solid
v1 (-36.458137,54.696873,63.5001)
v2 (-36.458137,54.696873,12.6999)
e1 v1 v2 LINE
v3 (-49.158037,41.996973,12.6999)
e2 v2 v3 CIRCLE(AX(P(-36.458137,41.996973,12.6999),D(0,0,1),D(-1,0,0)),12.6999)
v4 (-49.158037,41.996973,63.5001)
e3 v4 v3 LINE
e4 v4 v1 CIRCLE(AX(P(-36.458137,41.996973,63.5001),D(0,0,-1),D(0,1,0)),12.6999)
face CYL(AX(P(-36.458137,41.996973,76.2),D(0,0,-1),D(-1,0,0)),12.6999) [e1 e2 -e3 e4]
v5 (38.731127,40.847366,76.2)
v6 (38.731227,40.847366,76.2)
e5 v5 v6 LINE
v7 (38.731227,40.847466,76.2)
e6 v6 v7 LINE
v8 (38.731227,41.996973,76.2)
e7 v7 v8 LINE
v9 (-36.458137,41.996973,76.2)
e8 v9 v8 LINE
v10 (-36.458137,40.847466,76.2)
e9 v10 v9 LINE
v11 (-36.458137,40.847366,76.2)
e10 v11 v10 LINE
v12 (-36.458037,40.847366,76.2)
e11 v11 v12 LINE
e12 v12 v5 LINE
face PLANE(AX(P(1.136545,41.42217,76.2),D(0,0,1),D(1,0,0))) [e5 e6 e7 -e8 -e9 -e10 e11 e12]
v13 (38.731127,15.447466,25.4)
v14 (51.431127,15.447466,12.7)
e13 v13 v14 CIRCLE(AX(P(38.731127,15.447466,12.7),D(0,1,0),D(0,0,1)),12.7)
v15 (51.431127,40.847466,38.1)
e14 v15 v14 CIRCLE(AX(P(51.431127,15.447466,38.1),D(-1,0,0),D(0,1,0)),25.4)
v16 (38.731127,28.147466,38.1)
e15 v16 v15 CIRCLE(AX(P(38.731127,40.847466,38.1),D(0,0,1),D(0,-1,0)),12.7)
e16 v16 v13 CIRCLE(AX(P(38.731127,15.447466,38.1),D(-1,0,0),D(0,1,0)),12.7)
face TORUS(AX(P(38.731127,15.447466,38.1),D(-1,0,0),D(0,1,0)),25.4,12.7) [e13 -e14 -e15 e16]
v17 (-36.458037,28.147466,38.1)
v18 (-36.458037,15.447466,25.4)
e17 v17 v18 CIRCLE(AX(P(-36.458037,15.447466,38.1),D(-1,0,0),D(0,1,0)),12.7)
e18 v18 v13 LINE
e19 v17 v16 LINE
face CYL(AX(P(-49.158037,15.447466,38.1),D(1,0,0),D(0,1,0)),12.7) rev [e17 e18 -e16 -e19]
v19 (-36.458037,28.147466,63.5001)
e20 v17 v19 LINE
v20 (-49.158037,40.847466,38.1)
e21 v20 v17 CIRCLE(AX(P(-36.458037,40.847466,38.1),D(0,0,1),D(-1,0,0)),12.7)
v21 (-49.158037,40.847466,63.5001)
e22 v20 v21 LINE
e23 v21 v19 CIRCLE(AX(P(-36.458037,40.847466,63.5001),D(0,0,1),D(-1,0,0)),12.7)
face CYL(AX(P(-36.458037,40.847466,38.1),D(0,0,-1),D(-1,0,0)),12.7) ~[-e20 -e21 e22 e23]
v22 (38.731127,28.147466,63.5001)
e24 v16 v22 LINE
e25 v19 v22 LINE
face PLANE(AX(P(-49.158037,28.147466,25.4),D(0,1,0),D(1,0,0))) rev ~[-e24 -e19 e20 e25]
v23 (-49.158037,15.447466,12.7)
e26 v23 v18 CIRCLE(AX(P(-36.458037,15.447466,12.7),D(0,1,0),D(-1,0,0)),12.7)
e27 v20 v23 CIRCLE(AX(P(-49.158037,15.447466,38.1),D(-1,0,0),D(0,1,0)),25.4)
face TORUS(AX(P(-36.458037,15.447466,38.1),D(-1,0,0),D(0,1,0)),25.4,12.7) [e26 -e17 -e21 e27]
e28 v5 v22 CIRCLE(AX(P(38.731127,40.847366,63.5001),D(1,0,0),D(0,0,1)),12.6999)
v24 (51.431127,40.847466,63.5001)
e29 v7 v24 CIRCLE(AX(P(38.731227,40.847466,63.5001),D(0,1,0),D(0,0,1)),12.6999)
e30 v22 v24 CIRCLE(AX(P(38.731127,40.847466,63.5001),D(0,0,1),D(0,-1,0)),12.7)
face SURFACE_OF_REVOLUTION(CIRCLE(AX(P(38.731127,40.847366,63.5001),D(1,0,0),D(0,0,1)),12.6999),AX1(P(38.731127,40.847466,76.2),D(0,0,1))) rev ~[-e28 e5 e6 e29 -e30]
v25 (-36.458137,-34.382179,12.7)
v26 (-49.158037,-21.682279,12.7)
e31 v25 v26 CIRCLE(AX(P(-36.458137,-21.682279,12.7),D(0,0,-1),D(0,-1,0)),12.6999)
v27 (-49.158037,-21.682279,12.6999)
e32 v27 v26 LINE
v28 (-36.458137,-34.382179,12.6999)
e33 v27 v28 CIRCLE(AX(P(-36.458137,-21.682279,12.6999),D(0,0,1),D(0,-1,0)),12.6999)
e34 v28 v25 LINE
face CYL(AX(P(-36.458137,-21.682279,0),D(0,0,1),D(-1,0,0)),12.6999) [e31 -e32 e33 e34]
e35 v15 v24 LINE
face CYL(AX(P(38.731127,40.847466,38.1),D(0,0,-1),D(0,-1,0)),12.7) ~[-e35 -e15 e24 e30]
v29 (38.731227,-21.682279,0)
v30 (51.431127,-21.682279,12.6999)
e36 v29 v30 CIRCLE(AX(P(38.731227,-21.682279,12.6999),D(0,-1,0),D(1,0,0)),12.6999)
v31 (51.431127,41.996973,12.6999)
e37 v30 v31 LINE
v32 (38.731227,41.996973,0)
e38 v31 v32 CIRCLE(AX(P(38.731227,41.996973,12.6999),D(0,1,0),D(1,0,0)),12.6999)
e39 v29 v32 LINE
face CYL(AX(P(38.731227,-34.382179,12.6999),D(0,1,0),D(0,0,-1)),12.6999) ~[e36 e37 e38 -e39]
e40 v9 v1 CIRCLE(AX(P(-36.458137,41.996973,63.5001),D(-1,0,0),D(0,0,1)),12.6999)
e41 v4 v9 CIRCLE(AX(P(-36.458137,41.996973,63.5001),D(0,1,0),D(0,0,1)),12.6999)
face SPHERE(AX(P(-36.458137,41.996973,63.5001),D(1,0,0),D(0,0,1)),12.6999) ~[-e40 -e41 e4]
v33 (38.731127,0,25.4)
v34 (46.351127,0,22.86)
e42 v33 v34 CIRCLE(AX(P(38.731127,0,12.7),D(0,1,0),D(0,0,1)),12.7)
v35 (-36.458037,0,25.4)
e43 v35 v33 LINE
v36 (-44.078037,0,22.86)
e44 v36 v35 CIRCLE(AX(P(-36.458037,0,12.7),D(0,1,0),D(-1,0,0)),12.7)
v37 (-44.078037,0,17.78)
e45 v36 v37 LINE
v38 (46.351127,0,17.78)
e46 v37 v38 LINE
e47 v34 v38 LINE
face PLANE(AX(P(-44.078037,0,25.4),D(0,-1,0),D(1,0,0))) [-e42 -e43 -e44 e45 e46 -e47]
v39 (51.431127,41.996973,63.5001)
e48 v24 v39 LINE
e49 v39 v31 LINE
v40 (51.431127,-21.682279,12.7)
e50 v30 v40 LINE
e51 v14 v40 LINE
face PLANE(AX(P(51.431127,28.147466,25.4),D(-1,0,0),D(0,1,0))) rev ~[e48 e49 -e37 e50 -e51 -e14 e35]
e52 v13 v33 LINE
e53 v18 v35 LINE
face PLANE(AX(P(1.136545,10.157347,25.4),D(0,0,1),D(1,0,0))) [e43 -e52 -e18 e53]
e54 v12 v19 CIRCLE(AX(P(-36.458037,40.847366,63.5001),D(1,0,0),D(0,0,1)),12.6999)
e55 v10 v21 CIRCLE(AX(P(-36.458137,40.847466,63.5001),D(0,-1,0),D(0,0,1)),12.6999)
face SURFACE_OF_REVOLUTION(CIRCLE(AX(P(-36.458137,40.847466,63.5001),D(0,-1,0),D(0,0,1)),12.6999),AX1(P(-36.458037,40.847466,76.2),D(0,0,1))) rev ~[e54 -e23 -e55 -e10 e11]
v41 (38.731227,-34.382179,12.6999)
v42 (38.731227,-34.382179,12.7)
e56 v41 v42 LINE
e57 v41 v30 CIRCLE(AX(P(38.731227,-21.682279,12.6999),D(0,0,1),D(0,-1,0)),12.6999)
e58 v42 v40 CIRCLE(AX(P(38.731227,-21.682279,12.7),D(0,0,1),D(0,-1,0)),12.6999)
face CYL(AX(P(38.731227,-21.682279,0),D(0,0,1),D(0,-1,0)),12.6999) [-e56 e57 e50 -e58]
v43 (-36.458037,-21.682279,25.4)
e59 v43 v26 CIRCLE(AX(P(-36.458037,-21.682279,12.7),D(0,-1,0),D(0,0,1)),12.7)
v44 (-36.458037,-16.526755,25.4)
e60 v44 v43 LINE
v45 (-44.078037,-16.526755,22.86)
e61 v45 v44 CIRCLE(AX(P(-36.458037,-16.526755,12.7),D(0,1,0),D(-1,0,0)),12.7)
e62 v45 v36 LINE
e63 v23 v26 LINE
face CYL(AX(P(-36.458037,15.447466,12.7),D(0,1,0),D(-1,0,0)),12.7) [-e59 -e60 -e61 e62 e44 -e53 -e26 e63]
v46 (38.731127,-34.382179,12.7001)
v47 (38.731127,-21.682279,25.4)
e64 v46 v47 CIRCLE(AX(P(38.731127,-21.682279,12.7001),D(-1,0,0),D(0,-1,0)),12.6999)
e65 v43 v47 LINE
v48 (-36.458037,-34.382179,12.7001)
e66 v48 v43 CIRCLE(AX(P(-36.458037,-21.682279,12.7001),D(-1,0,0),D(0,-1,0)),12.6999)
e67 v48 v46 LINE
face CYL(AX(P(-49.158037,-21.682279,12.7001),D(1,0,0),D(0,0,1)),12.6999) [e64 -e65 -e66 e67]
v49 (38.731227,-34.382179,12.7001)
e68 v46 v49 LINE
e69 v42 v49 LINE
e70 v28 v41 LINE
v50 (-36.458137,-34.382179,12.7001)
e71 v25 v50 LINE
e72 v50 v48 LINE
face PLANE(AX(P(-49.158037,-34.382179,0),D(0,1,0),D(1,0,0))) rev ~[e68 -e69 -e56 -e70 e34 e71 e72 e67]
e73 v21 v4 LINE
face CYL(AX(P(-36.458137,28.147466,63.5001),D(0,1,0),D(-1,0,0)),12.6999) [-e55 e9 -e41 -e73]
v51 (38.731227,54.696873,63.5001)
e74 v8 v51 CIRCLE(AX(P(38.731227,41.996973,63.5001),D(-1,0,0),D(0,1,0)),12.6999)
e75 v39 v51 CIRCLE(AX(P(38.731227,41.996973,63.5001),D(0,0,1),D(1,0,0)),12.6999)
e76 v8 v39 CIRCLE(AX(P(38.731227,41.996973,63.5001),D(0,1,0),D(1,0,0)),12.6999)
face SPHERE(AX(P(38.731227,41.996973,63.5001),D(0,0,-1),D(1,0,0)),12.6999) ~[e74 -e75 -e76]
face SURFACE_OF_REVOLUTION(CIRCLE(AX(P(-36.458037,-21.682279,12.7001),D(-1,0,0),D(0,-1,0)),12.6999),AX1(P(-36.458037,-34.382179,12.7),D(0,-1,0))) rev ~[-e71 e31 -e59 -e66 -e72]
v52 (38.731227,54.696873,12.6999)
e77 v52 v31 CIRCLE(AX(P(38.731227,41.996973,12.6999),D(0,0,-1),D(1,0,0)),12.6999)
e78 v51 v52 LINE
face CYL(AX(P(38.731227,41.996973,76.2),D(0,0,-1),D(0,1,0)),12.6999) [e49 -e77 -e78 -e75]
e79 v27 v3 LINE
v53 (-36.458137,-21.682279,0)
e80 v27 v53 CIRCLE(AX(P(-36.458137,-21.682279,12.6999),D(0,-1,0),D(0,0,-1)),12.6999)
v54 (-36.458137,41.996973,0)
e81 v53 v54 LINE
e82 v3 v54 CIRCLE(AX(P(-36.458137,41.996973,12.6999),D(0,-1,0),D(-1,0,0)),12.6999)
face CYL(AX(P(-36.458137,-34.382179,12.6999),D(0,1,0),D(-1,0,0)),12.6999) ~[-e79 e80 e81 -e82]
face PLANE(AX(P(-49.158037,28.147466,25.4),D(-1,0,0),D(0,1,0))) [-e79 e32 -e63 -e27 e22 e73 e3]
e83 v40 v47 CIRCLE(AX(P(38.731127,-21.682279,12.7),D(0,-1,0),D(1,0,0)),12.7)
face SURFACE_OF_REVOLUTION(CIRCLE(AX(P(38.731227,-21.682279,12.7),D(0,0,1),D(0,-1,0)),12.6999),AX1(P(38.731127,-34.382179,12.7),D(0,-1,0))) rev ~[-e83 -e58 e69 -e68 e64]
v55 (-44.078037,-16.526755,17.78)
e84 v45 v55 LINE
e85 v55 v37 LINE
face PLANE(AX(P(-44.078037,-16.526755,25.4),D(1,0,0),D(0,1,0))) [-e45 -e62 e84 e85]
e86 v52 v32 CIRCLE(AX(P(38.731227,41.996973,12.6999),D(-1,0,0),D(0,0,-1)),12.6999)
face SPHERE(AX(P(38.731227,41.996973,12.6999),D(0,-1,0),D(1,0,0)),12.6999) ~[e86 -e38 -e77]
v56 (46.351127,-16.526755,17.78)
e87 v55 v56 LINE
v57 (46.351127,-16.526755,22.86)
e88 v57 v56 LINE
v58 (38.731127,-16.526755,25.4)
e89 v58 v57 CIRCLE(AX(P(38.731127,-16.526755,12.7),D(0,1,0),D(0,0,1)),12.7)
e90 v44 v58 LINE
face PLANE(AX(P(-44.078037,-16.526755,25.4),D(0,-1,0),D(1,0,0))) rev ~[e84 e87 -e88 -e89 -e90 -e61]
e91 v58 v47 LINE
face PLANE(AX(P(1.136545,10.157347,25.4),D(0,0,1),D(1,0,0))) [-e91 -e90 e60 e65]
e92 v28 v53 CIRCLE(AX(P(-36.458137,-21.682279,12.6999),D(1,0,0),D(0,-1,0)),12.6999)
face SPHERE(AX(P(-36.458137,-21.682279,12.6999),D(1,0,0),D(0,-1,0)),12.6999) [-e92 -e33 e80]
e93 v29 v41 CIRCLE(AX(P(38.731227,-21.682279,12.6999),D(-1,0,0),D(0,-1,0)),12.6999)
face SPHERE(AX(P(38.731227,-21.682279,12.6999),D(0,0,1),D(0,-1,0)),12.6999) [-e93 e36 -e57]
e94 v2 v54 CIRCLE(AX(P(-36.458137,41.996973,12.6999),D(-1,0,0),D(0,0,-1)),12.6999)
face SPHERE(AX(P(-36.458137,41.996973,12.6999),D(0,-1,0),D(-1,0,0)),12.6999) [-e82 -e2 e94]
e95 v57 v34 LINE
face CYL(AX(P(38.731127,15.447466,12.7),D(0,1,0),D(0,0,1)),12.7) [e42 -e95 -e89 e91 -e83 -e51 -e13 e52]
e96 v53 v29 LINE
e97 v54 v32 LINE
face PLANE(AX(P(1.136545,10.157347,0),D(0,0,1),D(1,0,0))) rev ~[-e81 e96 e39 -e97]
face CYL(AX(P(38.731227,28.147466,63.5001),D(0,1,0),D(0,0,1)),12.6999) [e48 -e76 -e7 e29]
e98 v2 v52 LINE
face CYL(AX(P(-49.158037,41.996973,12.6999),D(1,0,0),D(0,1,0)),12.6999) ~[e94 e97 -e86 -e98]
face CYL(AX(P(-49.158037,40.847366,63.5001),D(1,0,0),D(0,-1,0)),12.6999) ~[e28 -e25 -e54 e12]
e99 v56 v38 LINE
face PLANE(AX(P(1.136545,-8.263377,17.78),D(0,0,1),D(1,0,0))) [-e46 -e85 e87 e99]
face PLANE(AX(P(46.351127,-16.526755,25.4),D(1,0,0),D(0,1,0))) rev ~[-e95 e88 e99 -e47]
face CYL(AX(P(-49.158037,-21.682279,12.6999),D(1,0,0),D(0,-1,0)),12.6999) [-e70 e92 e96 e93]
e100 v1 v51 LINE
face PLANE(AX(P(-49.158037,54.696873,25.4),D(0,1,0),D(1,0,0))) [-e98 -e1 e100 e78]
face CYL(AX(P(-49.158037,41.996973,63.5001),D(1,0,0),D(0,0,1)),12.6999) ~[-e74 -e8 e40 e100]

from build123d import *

# Parameters (mm, degrees)
F0_W         = 100.5891636014
F0_H         = 89.0790522099
F1_DEPTH     = 25.4
F2_W         = 100.5891636014
F2_H         = 26.5494063497
F3_DEPTH     = 50.8
F4_W         = 90.4291636014
F4_H         = 16.5267549455
F5_DEPTH     = 7.62
F6_F1_R      = 12.7
F6_F2_R      = 12.6999
F6_T3_DEPTH  = 49.8296458602
F6_T5_DEPTH  = 38.1
F6_T8_ANGLE  = 90
F6_T10_ANGLE = 90
F6_T12_ANGLE = 90
F6_T14_ANGLE = 90
F6_T16_ANGLE = 90
F6_T18_ANGLE = 90


# Not quite as in the source:
# - a fillet or chamfer that OpenCascade refuses, or shapes differently, is made with other operations: its cross-section is extruded or revolved along the edge and cut away or added
# - a fillet or chamfer is up to 0.001 mm smaller than in the source, because OpenCascade refuses the exact size


with BuildPart() as f1:
    # F0 (on Top) → F1 (new body)
    with BuildSketch(Plane.XY):
        with Locations((1.1365450919, 10.1573467255)):
            Rectangle(F0_W, F0_H)
    extrude(amount=F1_DEPTH)

    # F2 (on face) → F3 (join)
    with BuildSketch(Plane.XY.offset(25.4)):
        with Locations((1.1365450919, 41.4221696556)):
            Rectangle(F2_W, F2_H)
    extrude(amount=F3_DEPTH)

    # F4 (on face) → F5 (cut)
    with BuildSketch(Plane.XY.offset(25.4)):
        with Locations((1.1365450919, -8.2633774728)):
            Rectangle(F4_W, F4_H)
    extrude(amount=-F5_DEPTH, mode=Mode.SUBTRACT)

    # F6: fillet of radius 12.7 on 18 edges, made by hand

    # F6_f1
    f6_f1_edges = [f1.edges().sort_by_distance(p)[0] for p in [
        (1.1365450919, 28.1474664807, 25.4),
    ]]
    fillet(f6_f1_edges, radius=F6_F1_R)

    # F6_f2 (radius 12.7 in the source; OpenCascade refuses exactly that, so slightly less here)
    f6_f2_edges = [f1.edges().sort_by_distance(p)[0] for p in [
        (1.1365450919, -34.3821793795, 25.4),
        (51.4311268926, -34.3821793795, 12.7),
        (1.1365450919, -34.3821793795, 0),
        (-49.1580367088, -34.3821793795, 12.7),
        (1.1365450919, 28.1474664807, 76.2),
        (51.4311268926, 10.1573467255, 0),
        (51.4311268926, 54.6968728304, 38.1),
        (51.4311268926, 41.4221696556, 76.2),
        (1.1365450919, 54.6968728304, 76.2),
        (-49.1580367088, 41.4221696556, 76.2),
        (-49.1580367088, 10.1573467255, 0),
        (-49.1580367088, 54.6968728304, 38.1),
        (1.1365450919, 54.6968728304, 0),
    ]]
    fillet(f6_f2_edges, radius=F6_F2_R)

    # F6_s4 → F6_t3 (cut)
    with BuildSketch(Plane.XZ.offset(-15.4474664807)):
        with BuildLine():
            ThreePointArc((-49.1580367088, 12.7), (-45.4382928299, 21.6802561211), (-36.4580367088, 25.4))
            Line((-36.4580367088, 25.4), (-36.4580367088, 25.654))
            Line((-36.4580367088, 25.654), (-49.4120367088, 25.654))
            Line((-49.4120367088, 25.654), (-49.4120367088, 12.7))
            Line((-49.4120367088, 12.7), (-49.1580367088, 12.7))
        make_face()
        with BuildLine():
            ThreePointArc((38.7311268926, 25.4), (47.7113830136, 21.6802561211), (51.4311268926, 12.7))
            Line((51.4311268926, 12.7), (51.6851268926, 12.7))
            Line((51.6851268926, 12.7), (51.6851268926, 25.654))
            Line((51.6851268926, 25.654), (38.7311268926, 25.654))
            Line((38.7311268926, 25.654), (38.7311268926, 25.4))
        make_face()
    extrude(amount=F6_T3_DEPTH, mode=Mode.SUBTRACT)

    # F6_s6 → F6_t5 (cut)
    with BuildSketch(Plane.XY.offset(38.1)):
        with BuildLine():
            ThreePointArc((-49.1580367088, 40.8474664807), (-45.4382928299, 31.8672103597), (-36.4580367088, 28.1474664807))
            Line((-36.4580367088, 28.1474664807), (-36.4580367088, 27.8934664807))
            Line((-36.4580367088, 27.8934664807), (-49.4120367088, 27.8934664807))
            Line((-49.4120367088, 27.8934664807), (-49.4120367088, 40.8474664807))
            Line((-49.4120367088, 40.8474664807), (-49.1580367088, 40.8474664807))
        make_face()
        with BuildLine():
            ThreePointArc((38.7311268926, 28.1474664807), (47.7113830136, 31.8672103597), (51.4311268926, 40.8474664807))
            Line((51.4311268926, 40.8474664807), (51.6851268926, 40.8474664807))
            Line((51.6851268926, 40.8474664807), (51.6851268926, 27.8934664807))
            Line((51.6851268926, 27.8934664807), (38.7311268926, 27.8934664807))
            Line((38.7311268926, 27.8934664807), (38.7311268926, 28.1474664807))
        make_face()
    extrude(amount=F6_T5_DEPTH, mode=Mode.SUBTRACT)

    # F6_s7 → F6_t8 (revolve, cut)
    with BuildSketch(Plane.XY.offset(12.7)):
        with BuildLine():
            ThreePointArc((38.7312268926, -34.3821793795), (47.711412303, -30.6624647899), (51.4311268926, -21.6822793795))
            Line((51.4311268926, -21.6822793795), (51.4311268926, -34.3821793795))
            Line((51.4311268926, -34.3821793795), (38.7312268926, -34.3821793795))
        make_face()
    revolve(axis=Axis((38.7311268926, -34.3821793795, 12.7), (0, -1, 0)), revolution_arc=F6_T8_ANGLE, mode=Mode.SUBTRACT)

    # F6_s9 → F6_t10 (revolve, cut)
    with BuildSketch(Plane.YZ.offset(38.7311268926)):
        with BuildLine():
            ThreePointArc((40.8473664807, 76.2), (31.8671810703, 72.4802854104), (28.1474664807, 63.5001))
            Line((28.1474664807, 63.5001), (28.1474664807, 76.2))
            Line((28.1474664807, 76.2), (40.8473664807, 76.2))
        make_face()
    revolve(axis=Axis((38.7311268926, 40.8474664807, 76.2), (0, 0, 1)), revolution_arc=F6_T10_ANGLE, mode=Mode.SUBTRACT)

    # F6_s11 → F6_t12 (revolve, cut)
    with BuildSketch(Plane.XZ.offset(-40.8474664807)):
        with BuildLine():
            ThreePointArc((-36.4581367088, 76.2), (-45.4383221192, 72.4802854104), (-49.1580367088, 63.5001))
            Line((-49.1580367088, 63.5001), (-49.1580367088, 76.2))
            Line((-49.1580367088, 76.2), (-36.4581367088, 76.2))
        make_face()
    revolve(axis=Axis((-36.4580367088, 40.8474664807, 76.2), (0, 0, 1)), revolution_arc=F6_T12_ANGLE, mode=Mode.SUBTRACT)

    # F6_s13 → F6_t14 (revolve, cut)
    with BuildSketch(Plane.YZ.offset(-36.4580367088)):
        with BuildLine():
            ThreePointArc((-34.3821793795, 12.7001), (-30.6624647899, 21.6802854104), (-21.6822793795, 25.4))
            Line((-21.6822793795, 25.4), (-34.3821793795, 25.4))
            Line((-34.3821793795, 25.4), (-34.3821793795, 12.7001))
        make_face()
    revolve(axis=Axis((-36.4580367088, -34.3821793795, 12.7), (0, -1, 0)), revolution_arc=F6_T14_ANGLE, mode=Mode.SUBTRACT)

    # F6_s15 → F6_t16 (revolve, cut)
    with BuildSketch(Plane.XY.offset(38.1)):
        with BuildLine():
            ThreePointArc((38.7311268926, 28.1474664807), (47.7113830136, 31.8672103597), (51.4311268926, 40.8474664807))
            Line((51.4311268926, 40.8474664807), (51.6851268926, 40.8474664807))
            Line((51.6851268926, 40.8474664807), (51.6851268926, 27.8934664807))
            Line((51.6851268926, 27.8934664807), (38.7311268926, 27.8934664807))
            Line((38.7311268926, 27.8934664807), (38.7311268926, 28.1474664807))
        make_face()
    revolve(axis=Axis((51.4311268926, 15.4474664807, 38.1), (-1, 0, 0)), revolution_arc=F6_T16_ANGLE, mode=Mode.SUBTRACT)

    # F6_s17 → F6_t18 (revolve, cut)
    with BuildSketch(Plane.XY.offset(38.1)):
        with BuildLine():
            ThreePointArc((-49.1580367088, 40.8474664807), (-45.4382928299, 31.8672103597), (-36.4580367088, 28.1474664807))
            Line((-36.4580367088, 28.1474664807), (-36.4580367088, 27.8934664807))
            Line((-36.4580367088, 27.8934664807), (-49.4120367088, 27.8934664807))
            Line((-49.4120367088, 27.8934664807), (-49.4120367088, 40.8474664807))
            Line((-49.4120367088, 40.8474664807), (-49.1580367088, 40.8474664807))
        make_face()
    revolve(axis=Axis((-49.1580367088, 15.4474664807, 38.1), (-1, 0, 0)), revolution_arc=F6_T18_ANGLE, mode=Mode.SUBTRACT)


solid = f1.part
